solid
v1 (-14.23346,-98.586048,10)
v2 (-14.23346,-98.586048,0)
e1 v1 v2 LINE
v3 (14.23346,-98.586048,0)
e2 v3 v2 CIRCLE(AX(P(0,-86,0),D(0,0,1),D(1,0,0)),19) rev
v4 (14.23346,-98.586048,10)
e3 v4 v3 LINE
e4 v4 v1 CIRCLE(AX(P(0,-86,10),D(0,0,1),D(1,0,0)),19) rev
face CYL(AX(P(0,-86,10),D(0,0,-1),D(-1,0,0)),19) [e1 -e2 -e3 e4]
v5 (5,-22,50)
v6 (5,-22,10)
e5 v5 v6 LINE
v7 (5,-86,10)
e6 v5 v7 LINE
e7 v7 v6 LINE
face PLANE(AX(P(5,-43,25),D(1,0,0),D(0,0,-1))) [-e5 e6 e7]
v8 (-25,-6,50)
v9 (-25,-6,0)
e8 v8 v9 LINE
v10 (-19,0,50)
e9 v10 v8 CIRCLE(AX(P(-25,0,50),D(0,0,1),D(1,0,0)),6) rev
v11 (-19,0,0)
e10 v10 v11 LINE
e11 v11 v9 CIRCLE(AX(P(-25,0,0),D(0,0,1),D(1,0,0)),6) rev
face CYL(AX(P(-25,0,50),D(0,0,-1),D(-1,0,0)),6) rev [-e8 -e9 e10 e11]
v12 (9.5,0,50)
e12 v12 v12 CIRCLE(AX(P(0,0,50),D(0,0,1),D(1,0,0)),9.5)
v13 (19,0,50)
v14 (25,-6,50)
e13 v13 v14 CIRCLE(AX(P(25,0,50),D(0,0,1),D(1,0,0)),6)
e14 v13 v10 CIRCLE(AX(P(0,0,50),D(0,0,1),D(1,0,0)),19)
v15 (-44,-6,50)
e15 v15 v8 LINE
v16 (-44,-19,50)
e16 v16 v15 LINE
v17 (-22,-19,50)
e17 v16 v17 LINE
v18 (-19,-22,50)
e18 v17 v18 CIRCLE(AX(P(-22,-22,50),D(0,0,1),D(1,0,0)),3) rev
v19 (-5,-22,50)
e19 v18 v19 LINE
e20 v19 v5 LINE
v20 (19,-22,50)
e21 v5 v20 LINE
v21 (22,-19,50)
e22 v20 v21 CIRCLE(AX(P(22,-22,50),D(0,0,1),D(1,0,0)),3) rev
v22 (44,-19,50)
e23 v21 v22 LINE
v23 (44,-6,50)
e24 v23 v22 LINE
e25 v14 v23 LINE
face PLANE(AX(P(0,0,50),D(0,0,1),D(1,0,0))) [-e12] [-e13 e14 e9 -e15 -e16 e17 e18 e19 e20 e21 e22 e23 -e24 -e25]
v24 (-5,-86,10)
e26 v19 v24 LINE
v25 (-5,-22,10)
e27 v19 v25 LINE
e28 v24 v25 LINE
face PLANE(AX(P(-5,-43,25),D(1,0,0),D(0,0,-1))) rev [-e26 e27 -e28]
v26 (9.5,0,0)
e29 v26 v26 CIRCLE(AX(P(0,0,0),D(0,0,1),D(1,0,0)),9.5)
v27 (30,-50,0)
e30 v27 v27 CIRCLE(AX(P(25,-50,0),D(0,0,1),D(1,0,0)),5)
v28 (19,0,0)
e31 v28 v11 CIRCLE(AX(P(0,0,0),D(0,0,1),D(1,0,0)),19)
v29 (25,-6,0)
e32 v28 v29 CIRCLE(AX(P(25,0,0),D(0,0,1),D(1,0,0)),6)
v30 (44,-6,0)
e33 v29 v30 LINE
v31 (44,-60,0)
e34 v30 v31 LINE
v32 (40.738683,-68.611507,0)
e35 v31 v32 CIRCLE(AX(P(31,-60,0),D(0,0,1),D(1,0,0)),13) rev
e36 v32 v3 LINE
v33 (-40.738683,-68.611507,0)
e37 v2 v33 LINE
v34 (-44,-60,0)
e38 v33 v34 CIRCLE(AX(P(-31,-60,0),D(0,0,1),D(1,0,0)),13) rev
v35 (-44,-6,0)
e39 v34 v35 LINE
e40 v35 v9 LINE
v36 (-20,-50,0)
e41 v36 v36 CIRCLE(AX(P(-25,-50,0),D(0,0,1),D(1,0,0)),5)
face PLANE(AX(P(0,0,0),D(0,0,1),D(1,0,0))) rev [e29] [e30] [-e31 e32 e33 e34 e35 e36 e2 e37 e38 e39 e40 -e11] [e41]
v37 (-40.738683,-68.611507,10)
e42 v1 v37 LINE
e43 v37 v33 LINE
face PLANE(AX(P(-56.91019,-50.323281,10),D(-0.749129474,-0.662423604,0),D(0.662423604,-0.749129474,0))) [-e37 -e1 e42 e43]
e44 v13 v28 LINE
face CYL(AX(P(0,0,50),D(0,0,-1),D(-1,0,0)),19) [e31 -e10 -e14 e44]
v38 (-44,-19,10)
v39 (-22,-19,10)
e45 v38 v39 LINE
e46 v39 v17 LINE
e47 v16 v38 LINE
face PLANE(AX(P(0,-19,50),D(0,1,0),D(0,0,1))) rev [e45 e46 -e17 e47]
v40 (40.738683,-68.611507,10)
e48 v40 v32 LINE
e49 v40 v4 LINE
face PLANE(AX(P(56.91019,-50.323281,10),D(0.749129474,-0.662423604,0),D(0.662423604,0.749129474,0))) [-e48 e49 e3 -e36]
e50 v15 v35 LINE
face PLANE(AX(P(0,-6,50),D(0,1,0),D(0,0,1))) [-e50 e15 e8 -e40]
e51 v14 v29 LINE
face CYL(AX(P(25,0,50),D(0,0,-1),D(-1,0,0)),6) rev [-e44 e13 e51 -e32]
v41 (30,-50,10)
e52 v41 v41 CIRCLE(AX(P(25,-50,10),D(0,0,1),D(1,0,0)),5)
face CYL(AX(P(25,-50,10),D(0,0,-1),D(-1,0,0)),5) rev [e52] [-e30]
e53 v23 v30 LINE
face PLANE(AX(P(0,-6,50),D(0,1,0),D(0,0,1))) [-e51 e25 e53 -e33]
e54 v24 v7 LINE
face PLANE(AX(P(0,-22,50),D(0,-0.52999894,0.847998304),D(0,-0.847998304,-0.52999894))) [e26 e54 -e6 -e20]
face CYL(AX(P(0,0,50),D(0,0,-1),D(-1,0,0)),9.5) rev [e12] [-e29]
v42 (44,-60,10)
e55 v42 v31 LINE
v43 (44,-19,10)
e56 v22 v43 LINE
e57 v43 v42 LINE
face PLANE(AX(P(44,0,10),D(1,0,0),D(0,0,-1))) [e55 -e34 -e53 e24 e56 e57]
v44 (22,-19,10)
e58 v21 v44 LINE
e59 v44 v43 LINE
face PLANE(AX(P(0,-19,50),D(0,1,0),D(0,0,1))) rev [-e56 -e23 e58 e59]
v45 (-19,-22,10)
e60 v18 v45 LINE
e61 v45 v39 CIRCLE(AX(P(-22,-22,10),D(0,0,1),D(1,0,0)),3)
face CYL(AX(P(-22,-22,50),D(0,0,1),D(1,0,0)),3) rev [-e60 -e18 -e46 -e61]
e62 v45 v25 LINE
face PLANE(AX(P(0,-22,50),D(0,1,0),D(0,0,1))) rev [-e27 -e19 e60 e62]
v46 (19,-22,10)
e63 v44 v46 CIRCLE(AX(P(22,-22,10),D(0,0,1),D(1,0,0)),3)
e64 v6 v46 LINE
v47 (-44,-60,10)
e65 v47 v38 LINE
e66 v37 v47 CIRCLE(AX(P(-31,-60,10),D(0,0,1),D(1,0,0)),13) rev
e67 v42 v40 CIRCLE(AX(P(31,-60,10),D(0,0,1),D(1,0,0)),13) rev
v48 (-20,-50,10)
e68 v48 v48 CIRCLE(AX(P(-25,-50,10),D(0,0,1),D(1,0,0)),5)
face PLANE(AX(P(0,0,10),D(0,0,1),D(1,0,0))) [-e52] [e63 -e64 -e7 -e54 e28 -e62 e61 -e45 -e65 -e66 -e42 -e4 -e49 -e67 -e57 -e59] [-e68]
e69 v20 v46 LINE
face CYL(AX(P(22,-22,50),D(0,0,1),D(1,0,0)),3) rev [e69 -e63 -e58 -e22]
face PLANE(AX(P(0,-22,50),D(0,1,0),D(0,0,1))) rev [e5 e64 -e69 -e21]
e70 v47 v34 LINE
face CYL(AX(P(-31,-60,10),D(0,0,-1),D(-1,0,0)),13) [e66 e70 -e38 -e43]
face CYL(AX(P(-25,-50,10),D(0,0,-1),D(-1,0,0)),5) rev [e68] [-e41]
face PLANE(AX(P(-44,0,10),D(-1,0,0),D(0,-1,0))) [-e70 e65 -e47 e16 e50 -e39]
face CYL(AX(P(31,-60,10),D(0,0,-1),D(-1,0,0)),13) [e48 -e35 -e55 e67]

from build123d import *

# Parameters (mm, degrees)
SKETCH1_R           = 5
BOSS_EXTRUDE1_DEPTH = 10
SKETCH1_3_R         = 9.5
BOSS_EXTRUDE2_DEPTH = 50
RIB1_REACH          = 126.342
SKETCH2_WALL_W      = 326.156388182
SKETCH2_WALL_H      = 10
FILLET1_R           = 3


with BuildPart() as part:
    # Sketch1 → Boss-Extrude1 (new body)
    with BuildSketch(Plane.XY):
        with BuildLine():
            Line((-19, -19), (-44, -19))
            Line((-44, -19), (-44, -60))
            ThreePointArc((-44, -60), (-43.157361579, -64.604189335), (-40.738683164, -68.61150685))
            Line((-40.738683164, -68.61150685), (-14.233460009, -98.586048473))
            ThreePointArc((-14.233460009, -98.586048473), (0, -105), (14.233460009, -98.586048473))
            Line((14.233460009, -98.586048473), (40.738683164, -68.61150685))
            ThreePointArc((40.738683164, -68.61150685), (43.157361579, -64.604189335), (44, -60))
            Line((44, -60), (44, -19))
            Line((44, -19), (19, -19))
            Line((19, -19), (19, -22))
            Line((19, -22), (-19, -22))
            Line((-19, -22), (-19, -19))
        make_face()
        with Locations((-25, -50)):
            Circle(SKETCH1_R, mode=Mode.SUBTRACT)
        with Locations((25, -50)):
            Circle(SKETCH1_R, mode=Mode.SUBTRACT)
    extrude(amount=BOSS_EXTRUDE1_DEPTH)

    # Sketch1<3> → Boss-Extrude2 (add)
    with BuildSketch(Plane.XY):
        with BuildLine():
            Line((-25, -6), (-44, -6))
            Line((-44, -6), (-44, -19))
            Line((-44, -19), (-19, -19))
            Line((-19, -19), (-19, -22))
            Line((-19, -22), (19, -22))
            Line((19, -22), (19, -19))
            Line((19, -19), (44, -19))
            Line((44, -19), (44, -6))
            Line((44, -6), (25, -6))
            ThreePointArc((25, -6), (20.757359313, -4.242640687), (19, 0))
            ThreePointArc((19, 0), (0, 19), (-19, 0))
            ThreePointArc((-19, 0), (-20.757359313, -4.242640687), (-25, -6))
        make_face()
        Circle(SKETCH1_3_R, mode=Mode.SUBTRACT)
    extrude(amount=BOSS_EXTRUDE2_DEPTH)

    # Sketch2 wall → Rib1 (add, up to next)
    with BuildSketch(Plane(origin=(0, -54, 30), x_dir=(0, -0.847998304005, -0.529998940003), z_dir=(0, 0.529998940003, -0.847998304005)), mode=Mode.PRIVATE) as rib1_sk1:
        Rectangle(SKETCH2_WALL_W, SKETCH2_WALL_H)
    rib1_tool1 = extrude(rib1_sk1.sketch, amount=RIB1_REACH, mode=Mode.PRIVATE) - part.part
    add(rib1_tool1.solids().sort_by_distance((0, -54, 30))[0])

    # Fillet1
    fillet1_edges = [part.edges().sort_by_distance(p)[0] for p in [
        (-19, -19, 30),
        (19, -19, 30),
    ]]
    fillet(fillet1_edges, radius=FILLET1_R - 0.0001)  # a hair under: the kernel refuses the full size


solid = part.part
